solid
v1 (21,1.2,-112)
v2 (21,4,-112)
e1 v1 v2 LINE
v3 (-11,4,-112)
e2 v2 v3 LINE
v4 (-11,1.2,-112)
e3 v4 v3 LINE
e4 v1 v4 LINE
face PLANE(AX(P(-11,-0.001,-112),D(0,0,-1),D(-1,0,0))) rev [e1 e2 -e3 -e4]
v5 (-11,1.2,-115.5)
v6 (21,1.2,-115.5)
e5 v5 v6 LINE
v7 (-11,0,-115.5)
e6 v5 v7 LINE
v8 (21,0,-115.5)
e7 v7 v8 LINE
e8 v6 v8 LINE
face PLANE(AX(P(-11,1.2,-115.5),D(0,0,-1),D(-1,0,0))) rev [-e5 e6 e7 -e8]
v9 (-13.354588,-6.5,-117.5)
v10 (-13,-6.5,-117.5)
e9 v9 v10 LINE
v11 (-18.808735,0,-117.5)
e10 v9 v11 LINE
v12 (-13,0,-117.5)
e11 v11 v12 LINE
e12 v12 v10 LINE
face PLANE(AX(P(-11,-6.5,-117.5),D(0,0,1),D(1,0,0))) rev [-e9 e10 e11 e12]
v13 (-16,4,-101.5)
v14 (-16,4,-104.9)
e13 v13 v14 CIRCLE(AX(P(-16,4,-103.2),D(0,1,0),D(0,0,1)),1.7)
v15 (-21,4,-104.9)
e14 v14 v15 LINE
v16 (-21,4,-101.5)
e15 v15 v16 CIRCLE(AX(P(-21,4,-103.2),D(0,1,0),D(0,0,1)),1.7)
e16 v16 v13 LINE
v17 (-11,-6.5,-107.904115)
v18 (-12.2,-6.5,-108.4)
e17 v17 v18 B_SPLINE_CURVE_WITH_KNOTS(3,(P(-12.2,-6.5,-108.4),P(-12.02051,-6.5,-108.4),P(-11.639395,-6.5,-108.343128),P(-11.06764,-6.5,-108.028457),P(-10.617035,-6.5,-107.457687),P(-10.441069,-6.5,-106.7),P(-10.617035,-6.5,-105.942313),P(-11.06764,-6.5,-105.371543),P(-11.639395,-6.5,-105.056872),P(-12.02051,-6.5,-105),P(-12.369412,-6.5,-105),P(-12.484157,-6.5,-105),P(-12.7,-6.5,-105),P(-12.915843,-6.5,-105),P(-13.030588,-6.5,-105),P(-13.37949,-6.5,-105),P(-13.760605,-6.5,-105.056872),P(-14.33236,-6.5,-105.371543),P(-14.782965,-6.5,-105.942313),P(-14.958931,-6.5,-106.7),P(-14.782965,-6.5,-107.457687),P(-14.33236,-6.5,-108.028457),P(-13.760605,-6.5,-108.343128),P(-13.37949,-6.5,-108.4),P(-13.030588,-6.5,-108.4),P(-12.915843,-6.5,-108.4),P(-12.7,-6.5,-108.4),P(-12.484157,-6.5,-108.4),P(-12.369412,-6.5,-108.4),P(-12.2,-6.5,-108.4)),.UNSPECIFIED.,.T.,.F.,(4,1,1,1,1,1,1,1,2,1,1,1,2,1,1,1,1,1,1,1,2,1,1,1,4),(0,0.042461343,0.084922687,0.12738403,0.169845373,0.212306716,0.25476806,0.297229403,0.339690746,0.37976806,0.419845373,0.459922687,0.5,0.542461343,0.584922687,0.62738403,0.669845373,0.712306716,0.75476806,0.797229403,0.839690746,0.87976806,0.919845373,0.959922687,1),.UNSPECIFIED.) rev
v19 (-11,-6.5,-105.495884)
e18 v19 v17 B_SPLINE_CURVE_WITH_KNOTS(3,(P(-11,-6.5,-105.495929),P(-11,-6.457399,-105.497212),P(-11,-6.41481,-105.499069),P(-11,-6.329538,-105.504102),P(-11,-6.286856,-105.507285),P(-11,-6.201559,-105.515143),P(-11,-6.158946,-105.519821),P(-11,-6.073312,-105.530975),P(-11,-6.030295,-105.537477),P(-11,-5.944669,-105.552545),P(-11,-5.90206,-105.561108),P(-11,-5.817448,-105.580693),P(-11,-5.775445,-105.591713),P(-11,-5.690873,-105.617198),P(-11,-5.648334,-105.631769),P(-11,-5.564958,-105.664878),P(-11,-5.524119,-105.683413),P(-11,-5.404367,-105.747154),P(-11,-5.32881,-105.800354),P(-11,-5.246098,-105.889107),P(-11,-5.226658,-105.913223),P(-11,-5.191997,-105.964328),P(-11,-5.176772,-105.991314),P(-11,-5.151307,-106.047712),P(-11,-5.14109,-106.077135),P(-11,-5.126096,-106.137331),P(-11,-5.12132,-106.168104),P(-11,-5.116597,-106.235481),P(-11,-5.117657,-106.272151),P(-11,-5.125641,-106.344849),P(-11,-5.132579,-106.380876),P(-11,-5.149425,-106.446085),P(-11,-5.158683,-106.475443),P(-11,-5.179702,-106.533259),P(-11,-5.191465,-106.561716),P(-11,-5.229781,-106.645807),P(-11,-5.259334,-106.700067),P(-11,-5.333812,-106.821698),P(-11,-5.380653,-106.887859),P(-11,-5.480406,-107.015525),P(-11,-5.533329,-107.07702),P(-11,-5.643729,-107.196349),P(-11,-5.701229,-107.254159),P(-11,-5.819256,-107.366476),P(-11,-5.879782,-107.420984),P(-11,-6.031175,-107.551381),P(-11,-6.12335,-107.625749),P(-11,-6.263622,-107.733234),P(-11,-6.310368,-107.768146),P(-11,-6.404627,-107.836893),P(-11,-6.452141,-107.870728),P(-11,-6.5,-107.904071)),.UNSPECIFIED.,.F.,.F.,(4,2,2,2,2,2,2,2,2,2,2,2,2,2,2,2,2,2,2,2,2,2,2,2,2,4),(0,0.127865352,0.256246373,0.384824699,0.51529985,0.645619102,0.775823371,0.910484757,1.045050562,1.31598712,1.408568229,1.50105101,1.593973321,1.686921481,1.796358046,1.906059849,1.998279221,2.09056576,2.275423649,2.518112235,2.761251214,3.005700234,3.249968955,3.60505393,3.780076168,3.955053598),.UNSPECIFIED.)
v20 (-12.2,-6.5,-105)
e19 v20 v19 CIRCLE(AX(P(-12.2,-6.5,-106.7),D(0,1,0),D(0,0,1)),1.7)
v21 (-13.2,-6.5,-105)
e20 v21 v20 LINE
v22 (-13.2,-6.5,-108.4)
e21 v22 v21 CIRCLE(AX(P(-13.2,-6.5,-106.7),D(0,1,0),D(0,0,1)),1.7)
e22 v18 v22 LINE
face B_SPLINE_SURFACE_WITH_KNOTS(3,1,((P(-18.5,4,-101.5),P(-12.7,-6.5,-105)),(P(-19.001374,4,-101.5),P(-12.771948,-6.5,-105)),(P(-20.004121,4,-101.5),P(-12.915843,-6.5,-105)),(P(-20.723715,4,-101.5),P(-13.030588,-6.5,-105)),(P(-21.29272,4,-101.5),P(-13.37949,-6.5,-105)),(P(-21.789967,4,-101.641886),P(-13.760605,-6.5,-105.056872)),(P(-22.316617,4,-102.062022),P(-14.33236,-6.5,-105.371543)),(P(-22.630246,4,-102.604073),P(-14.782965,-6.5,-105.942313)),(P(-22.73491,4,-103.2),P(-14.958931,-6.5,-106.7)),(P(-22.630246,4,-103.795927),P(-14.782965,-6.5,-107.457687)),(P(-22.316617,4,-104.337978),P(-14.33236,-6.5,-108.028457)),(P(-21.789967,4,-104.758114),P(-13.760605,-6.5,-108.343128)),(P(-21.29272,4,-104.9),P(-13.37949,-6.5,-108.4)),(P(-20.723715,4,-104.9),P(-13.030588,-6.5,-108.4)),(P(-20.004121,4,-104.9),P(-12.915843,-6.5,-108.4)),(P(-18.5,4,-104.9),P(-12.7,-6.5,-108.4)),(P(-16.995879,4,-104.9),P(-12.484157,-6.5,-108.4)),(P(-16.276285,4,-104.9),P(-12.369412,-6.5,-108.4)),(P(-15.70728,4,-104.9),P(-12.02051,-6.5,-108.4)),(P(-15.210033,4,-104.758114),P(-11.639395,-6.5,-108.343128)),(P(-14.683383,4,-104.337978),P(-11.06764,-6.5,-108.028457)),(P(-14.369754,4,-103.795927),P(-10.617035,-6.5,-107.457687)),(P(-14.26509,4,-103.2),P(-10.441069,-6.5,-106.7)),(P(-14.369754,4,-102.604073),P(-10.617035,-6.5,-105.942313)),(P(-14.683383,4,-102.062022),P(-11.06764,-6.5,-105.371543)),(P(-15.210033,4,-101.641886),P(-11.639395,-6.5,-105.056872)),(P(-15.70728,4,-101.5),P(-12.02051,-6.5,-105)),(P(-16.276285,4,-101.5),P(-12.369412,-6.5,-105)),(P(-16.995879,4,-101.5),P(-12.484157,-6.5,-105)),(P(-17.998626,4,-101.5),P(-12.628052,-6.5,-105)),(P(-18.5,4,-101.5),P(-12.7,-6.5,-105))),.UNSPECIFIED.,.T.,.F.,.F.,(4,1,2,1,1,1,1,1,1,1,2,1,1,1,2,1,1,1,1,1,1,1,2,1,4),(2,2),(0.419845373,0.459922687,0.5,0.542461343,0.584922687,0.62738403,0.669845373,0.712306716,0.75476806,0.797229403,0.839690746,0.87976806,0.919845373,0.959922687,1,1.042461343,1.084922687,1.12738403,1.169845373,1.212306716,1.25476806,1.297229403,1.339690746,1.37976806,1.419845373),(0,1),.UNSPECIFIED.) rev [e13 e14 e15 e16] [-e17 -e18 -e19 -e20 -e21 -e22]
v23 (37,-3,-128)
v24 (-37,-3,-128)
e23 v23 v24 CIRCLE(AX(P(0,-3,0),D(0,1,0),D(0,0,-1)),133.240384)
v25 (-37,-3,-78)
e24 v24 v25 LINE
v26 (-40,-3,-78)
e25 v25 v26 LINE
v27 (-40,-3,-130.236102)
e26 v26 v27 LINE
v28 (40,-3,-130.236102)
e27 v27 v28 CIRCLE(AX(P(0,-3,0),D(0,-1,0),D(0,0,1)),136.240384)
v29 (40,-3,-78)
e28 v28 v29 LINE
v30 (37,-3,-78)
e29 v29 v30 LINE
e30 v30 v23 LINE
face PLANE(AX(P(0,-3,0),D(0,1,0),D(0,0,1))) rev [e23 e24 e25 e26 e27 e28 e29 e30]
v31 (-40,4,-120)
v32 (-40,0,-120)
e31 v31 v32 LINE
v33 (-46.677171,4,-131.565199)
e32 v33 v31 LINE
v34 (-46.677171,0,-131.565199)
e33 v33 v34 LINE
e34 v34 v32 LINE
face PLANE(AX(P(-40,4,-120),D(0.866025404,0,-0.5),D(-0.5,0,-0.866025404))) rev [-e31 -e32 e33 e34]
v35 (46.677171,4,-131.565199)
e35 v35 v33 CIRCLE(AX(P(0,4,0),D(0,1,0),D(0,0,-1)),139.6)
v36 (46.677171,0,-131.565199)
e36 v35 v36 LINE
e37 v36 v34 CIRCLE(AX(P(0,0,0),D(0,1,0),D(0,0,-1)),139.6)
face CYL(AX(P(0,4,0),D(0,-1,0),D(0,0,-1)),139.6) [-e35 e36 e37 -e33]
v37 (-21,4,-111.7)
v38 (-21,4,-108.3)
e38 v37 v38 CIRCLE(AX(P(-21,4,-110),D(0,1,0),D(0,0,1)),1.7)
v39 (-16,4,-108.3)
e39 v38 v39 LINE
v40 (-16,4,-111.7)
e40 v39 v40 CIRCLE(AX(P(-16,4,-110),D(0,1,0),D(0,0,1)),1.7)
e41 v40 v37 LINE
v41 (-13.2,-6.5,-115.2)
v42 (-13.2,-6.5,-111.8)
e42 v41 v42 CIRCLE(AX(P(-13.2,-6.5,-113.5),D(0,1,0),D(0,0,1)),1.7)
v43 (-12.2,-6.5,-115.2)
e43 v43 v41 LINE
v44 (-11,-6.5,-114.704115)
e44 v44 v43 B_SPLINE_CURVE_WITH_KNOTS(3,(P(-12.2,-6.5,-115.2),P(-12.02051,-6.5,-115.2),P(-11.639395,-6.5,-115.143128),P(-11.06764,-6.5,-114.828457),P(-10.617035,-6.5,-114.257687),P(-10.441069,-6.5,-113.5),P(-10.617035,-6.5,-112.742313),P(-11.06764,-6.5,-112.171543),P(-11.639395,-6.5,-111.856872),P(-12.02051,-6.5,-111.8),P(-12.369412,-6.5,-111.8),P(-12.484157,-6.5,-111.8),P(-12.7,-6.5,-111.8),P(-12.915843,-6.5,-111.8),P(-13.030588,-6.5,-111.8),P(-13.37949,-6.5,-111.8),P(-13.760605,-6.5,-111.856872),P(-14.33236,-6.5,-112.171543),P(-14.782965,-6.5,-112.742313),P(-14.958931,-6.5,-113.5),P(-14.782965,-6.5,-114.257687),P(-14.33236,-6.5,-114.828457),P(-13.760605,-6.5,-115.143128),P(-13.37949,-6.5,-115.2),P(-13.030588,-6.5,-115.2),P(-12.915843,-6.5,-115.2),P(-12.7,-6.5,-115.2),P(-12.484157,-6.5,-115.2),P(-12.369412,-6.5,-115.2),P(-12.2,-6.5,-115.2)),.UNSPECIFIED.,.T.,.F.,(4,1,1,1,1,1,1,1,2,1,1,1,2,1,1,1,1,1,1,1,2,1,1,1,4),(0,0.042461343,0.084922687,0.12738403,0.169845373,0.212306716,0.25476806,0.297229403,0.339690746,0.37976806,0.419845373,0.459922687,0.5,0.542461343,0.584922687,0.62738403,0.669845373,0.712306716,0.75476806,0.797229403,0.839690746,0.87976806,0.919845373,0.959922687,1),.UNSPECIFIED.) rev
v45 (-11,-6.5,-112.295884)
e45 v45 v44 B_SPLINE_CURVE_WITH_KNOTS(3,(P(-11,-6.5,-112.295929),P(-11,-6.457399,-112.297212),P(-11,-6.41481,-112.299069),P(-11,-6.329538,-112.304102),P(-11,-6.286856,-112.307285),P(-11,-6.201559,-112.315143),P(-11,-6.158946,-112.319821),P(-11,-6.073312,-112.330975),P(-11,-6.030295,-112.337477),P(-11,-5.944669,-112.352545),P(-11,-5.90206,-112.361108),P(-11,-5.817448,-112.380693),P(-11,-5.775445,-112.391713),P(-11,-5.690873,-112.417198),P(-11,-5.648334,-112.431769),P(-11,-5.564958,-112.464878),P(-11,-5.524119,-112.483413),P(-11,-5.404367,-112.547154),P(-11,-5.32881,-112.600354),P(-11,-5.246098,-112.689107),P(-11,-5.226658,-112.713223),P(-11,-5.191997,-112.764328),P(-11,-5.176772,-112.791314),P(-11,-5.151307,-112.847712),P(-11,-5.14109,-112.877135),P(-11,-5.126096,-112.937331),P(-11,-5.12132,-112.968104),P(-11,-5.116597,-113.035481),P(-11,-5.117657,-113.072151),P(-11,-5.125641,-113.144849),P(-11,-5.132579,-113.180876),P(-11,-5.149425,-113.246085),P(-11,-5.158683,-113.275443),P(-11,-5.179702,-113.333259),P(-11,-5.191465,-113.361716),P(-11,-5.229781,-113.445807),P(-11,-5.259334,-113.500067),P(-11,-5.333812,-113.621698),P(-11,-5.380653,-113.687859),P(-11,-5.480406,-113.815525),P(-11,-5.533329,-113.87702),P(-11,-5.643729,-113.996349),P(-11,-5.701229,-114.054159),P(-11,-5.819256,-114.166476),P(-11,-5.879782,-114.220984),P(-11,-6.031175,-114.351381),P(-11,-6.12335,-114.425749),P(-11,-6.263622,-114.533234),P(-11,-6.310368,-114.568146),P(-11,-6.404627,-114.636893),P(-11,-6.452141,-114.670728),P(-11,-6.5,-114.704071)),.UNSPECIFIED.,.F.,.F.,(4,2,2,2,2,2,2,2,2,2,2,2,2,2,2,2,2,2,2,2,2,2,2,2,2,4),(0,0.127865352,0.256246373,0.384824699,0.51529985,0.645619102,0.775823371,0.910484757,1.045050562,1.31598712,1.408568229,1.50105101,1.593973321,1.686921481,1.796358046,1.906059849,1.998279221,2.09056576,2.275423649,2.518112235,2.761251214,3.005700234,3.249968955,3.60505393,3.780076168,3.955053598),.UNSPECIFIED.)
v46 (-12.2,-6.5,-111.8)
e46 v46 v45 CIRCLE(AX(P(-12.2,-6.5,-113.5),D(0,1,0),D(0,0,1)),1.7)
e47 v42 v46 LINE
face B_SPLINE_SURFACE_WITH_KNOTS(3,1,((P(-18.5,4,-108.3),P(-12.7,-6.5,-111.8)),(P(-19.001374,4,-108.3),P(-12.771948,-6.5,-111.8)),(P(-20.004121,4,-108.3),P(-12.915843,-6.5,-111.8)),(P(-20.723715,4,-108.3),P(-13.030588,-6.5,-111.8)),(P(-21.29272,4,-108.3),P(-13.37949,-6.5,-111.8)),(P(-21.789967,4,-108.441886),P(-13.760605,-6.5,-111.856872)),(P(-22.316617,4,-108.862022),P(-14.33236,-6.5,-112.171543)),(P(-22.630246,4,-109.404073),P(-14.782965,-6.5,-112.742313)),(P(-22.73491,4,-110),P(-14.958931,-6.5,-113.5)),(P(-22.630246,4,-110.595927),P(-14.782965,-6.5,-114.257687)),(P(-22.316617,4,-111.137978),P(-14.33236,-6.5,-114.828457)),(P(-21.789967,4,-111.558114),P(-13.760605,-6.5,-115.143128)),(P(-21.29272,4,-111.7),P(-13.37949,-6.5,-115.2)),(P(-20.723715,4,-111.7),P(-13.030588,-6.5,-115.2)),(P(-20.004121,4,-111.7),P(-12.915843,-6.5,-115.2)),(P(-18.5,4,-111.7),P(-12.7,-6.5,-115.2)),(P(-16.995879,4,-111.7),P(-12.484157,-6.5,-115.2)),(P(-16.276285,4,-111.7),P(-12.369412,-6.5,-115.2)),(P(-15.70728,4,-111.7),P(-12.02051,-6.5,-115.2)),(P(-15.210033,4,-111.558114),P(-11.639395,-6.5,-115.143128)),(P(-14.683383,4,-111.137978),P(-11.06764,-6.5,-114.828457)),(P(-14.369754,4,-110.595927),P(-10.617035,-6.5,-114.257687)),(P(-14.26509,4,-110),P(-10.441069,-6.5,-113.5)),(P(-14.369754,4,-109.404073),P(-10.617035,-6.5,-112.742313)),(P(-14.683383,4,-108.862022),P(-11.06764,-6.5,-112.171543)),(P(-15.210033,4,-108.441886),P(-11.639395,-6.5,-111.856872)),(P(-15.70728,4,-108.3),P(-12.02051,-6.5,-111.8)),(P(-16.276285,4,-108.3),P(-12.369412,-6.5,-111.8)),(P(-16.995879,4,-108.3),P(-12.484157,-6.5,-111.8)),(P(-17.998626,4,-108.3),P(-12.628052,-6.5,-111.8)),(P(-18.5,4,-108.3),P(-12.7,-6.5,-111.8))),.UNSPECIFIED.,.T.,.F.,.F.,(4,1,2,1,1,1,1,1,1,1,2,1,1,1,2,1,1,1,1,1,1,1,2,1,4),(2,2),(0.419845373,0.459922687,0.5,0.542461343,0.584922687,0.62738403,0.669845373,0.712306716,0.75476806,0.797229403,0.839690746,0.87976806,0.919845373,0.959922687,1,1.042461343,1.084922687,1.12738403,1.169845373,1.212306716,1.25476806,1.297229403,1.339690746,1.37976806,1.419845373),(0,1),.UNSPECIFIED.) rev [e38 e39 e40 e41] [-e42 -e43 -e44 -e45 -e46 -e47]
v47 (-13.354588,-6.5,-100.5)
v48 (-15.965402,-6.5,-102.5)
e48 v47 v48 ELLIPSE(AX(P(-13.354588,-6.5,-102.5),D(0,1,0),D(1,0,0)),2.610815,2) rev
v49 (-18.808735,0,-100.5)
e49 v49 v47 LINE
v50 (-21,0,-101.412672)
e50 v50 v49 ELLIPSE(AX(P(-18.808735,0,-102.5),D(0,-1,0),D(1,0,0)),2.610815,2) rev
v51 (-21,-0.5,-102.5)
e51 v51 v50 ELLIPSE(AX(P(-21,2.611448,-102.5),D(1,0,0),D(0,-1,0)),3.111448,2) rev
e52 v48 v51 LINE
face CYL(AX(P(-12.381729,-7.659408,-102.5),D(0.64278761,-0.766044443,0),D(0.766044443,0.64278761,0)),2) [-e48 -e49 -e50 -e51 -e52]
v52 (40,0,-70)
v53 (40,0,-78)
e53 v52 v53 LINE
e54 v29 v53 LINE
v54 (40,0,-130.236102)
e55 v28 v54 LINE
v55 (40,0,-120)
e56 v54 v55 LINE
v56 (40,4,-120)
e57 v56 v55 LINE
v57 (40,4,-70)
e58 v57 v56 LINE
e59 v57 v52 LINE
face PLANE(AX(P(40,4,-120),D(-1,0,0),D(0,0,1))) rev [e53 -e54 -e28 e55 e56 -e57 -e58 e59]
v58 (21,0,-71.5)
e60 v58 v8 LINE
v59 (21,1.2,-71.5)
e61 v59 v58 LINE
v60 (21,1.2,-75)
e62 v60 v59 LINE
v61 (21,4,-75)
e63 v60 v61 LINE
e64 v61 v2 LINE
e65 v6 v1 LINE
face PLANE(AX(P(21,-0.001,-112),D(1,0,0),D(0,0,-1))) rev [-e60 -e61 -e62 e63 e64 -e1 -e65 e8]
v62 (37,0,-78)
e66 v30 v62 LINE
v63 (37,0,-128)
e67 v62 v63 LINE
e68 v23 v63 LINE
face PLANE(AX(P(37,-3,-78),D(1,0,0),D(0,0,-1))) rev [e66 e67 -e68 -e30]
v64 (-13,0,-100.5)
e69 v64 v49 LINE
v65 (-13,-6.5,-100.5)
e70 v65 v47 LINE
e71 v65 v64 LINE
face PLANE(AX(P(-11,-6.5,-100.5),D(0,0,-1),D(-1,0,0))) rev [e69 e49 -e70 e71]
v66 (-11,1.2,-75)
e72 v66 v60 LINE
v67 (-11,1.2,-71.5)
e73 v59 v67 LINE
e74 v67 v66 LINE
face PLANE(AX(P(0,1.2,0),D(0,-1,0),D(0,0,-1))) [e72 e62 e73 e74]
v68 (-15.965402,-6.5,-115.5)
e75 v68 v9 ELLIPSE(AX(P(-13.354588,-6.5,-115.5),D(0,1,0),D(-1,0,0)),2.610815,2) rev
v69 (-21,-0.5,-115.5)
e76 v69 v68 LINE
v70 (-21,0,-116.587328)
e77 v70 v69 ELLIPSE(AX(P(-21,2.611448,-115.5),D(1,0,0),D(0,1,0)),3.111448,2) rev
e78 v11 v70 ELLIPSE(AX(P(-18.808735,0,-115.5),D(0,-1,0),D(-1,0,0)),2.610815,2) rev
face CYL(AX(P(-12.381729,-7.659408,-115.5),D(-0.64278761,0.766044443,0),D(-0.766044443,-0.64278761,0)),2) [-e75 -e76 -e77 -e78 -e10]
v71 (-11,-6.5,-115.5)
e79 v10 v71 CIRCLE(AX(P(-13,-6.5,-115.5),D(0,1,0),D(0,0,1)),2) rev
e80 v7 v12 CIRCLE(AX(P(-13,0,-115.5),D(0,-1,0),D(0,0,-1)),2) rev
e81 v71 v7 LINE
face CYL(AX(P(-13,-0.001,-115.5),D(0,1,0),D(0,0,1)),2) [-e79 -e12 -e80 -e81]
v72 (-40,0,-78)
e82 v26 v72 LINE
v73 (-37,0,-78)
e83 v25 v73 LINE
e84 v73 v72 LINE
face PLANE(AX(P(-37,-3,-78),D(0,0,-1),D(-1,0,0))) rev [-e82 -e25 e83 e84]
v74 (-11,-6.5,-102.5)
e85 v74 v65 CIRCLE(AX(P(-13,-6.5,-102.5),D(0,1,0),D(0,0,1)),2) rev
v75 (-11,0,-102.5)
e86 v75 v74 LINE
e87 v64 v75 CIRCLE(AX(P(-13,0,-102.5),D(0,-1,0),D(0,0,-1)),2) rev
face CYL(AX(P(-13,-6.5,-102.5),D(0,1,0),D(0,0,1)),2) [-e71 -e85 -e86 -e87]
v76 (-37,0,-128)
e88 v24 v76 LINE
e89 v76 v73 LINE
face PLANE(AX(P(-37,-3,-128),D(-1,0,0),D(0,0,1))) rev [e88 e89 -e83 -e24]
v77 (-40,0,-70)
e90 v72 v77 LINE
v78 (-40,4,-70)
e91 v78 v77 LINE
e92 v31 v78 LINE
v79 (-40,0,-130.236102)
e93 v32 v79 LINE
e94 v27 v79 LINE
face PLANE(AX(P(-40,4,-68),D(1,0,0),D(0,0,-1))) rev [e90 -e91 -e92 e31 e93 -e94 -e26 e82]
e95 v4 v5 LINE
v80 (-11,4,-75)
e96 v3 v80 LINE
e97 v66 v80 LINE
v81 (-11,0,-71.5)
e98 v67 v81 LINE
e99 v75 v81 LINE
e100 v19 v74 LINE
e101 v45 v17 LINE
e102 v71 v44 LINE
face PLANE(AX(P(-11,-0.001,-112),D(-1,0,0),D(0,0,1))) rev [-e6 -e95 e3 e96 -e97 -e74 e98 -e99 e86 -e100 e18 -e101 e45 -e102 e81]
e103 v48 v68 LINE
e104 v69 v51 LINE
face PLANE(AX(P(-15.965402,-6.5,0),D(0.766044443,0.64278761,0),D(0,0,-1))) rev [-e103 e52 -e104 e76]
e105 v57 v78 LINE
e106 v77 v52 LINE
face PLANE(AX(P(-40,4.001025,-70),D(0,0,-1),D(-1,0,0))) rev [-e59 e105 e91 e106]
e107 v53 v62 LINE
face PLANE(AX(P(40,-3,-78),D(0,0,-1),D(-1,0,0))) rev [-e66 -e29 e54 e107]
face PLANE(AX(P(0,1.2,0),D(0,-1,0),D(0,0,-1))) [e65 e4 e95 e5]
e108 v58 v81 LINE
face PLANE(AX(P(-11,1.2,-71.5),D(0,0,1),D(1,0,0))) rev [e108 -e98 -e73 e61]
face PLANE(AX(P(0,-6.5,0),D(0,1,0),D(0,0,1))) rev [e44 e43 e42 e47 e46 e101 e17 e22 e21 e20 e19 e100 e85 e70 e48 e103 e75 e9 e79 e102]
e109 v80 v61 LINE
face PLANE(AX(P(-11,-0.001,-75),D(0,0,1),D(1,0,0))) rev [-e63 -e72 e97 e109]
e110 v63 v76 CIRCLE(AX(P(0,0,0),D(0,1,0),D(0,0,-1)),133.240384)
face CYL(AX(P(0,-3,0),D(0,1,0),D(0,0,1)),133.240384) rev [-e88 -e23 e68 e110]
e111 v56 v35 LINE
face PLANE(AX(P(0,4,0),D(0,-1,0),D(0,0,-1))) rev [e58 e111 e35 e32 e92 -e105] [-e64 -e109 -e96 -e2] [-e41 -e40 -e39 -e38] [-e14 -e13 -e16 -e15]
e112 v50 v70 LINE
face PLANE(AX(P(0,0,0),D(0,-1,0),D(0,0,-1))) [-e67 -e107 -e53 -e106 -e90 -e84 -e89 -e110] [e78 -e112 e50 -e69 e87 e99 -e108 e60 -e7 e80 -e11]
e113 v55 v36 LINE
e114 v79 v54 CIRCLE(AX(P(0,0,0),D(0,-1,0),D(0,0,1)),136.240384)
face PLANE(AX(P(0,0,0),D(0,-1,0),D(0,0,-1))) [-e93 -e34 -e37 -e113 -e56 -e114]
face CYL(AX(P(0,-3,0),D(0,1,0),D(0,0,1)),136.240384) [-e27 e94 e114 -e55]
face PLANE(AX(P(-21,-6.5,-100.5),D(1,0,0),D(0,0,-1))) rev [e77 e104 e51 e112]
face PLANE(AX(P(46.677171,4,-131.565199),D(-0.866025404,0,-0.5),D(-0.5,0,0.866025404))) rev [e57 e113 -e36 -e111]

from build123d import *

# Parameters (mm, degrees)
BOSS_EXTRUDE1_DEPTH = 4
CUT_EXTRUDE1_REACH  = 149.251
SKETCH2_W           = 32
SKETCH2_H           = 37
SKETCH3_W           = 32
SKETCH3_H           = 44
CUT_EXTRUDE2_DEPTH  = 1.2
BOSS_EXTRUDE2_DEPTH = 3
CUT_EXTRUDE3_REACH  = 149.251
SKETCH5_W           = 80
SKETCH5_H           = 2
SKETCH13_W          = 10
SKETCH13_H          = 17
BOSS_EXTRUDE3_DEPTH = 6.5
LPATTERN1_COUNT     = 2
LPATTERN1_PITCH     = 6.8
CHAMFER1_SIZE       = 6
CHAMFER1_SIZE2      = 5.034597787
FILLET1_R           = 2


with BuildPart() as part:
    # Sketch1 → Boss-Extrude1 (new body)
    with BuildSketch(Plane(origin=(0, 0, 0), x_dir=(1, 0, 0), z_dir=(0, 1, 0))):
        with BuildLine():
            Line((-40, 68), (-40, 120))
            Line((-40, 120), (-46.677171015, 131.565199449))
            ThreePointArc((-46.677171015, 131.565199449), (0, 139.6), (46.677171015, 131.565199449))
            Line((46.677171015, 131.565199449), (40, 120))
            Line((40, 120), (40, 68))
            Line((40, 68), (-40, 68))
        make_face()
    extrude(amount=BOSS_EXTRUDE1_DEPTH)

    # Sketch2 → Cut-Extrude1 (cut, up to next)
    with BuildSketch(Plane(origin=(0, 4, 0), x_dir=(1, 0, 0), z_dir=(0, 1, 0)), mode=Mode.PRIVATE) as cut_extrude1_sk1:
        with Locations((5, 93.5)):
            Rectangle(SKETCH2_W, SKETCH2_H)
    cut_extrude1_tool1 = extrude(cut_extrude1_sk1.sketch, amount=-CUT_EXTRUDE1_REACH, mode=Mode.PRIVATE) & part.part
    add(cut_extrude1_tool1.solids().sort_by_distance((5, 4, -93.5))[0], mode=Mode.SUBTRACT)

    # Sketch3 → Cut-Extrude2 (cut)
    with BuildSketch(Plane.XZ):
        with Locations((5, -93.5)):
            Rectangle(SKETCH3_W, SKETCH3_H)
    extrude(amount=-CUT_EXTRUDE2_DEPTH, mode=Mode.SUBTRACT)

    # Sketch4 → Boss-Extrude2 (add)
    with BuildSketch(Plane.XZ):
        with BuildLine():
            Line((-40, -78), (-40, -130.236102159))
            ThreePointArc((-40, -130.236102159), (0, -136.240384268), (40, -130.236102159))
            Line((40, -130.236102159), (40, -78))
            Line((40, -78), (37, -78))
            Line((37, -78), (37, -128))
            ThreePointArc((37, -128), (0, -133.240384268), (-37, -128))
            Line((-37, -128), (-37, -78))
            Line((-37, -78), (-40, -78))
        make_face()
    extrude(amount=BOSS_EXTRUDE2_DEPTH)

    # Sketch5 → Cut-Extrude3 (cut, up to next)
    with BuildSketch(Plane.XZ, mode=Mode.PRIVATE) as cut_extrude3_sk1:
        with Locations((0, -69)):
            Rectangle(SKETCH5_W, SKETCH5_H)
    cut_extrude3_tool1 = extrude(cut_extrude3_sk1.sketch, amount=-CUT_EXTRUDE3_REACH, mode=Mode.PRIVATE) & part.part
    add(cut_extrude3_tool1.solids().sort_by_distance((0, 0, -69))[0], mode=Mode.SUBTRACT)

    # Sketch13 → Boss-Extrude3 (add)
    with BuildSketch(Plane.XZ):
        with Locations((-16, -109)):
            Rectangle(SKETCH13_W, SKETCH13_H)
    extrude(amount=BOSS_EXTRUDE3_DEPTH)

    # Cut-Loft1: read off the stored shape, not the designer's step
    # Cut-Loft1: loft between two sections, ruled curve by curve
    cut_loft1_from = [
        Edge.make_bspline([(-18.5, 4, -108.3), (-19.001373519, 4, -108.3), (-20.004120556, 4, -108.3), (-20.723714816, 4, -108.3), (-21.292720218, 4, -108.3), (-21.789967148, 4, -108.441885809), (-22.316617117, 4, -108.86202161), (-22.630245954, 4, -109.404072839), (-22.73490999, 4, -110), (-22.630245954, 4, -110.595927161), (-22.316617117, 4, -111.13797839), (-21.789967148, 4, -111.558114191), (-21.292720218, 4, -111.7), (-20.723714816, 4, -111.7), (-20.004120556, 4, -111.7), (-18.5, 4, -111.7), (-16.995879444, 4, -111.7), (-16.276285184, 4, -111.7), (-15.707279782, 4, -111.7), (-15.210032852, 4, -111.558114191), (-14.683382883, 4, -111.13797839), (-14.369754046, 4, -110.595927161), (-14.26509001, 4, -110), (-14.369754046, 4, -109.404072839), (-14.683382883, 4, -108.86202161), (-15.210032852, 4, -108.441885809), (-15.707279782, 4, -108.3), (-16.276285184, 4, -108.3), (-16.995879444, 4, -108.3), (-17.998626481, 4, -108.3), (-18.5, 4, -108.3)], [0.419845373, 0.419845373, 0.419845373, 0.419845373, 0.459922687, 0.5, 0.5, 0.542461343, 0.584922687, 0.62738403, 0.669845373, 0.712306716, 0.75476806, 0.797229403, 0.839690746, 0.839690746, 0.87976806, 0.919845373, 0.959922687, 1, 1, 1.042461343, 1.084922687, 1.12738403, 1.169845373, 1.212306716, 1.25476806, 1.297229403, 1.339690746, 1.339690746, 1.37976806, 1.419845373, 1.419845373, 1.419845373, 1.419845373], 3),
    ]
    cut_loft1_to = [
        Edge.make_bspline([(-12.7, -6.5, -111.8), (-12.771947826, -6.5, -111.8), (-12.915843478, -6.5, -111.8), (-13.030587652, -6.5, -111.8), (-13.379489971, -6.5, -111.8), (-13.760605324, -6.5, -111.856871893), (-14.332360426, -6.5, -112.171543481), (-14.782964502, -6.5, -112.74231317), (-14.958930975, -6.5, -113.5), (-14.782964502, -6.5, -114.25768683), (-14.332360426, -6.5, -114.828456519), (-13.760605324, -6.5, -115.143128107), (-13.379489971, -6.5, -115.2), (-13.030587652, -6.5, -115.2), (-12.915843478, -6.5, -115.2), (-12.7, -6.5, -115.2), (-12.484156522, -6.5, -115.2), (-12.369412348, -6.5, -115.2), (-12.020510029, -6.5, -115.2), (-11.639394676, -6.5, -115.143128107), (-11.067639574, -6.5, -114.828456519), (-10.617035498, -6.5, -114.25768683), (-10.441069025, -6.5, -113.5), (-10.617035498, -6.5, -112.74231317), (-11.067639574, -6.5, -112.171543481), (-11.639394676, -6.5, -111.856871893), (-12.020510029, -6.5, -111.8), (-12.369412348, -6.5, -111.8), (-12.484156522, -6.5, -111.8), (-12.628052174, -6.5, -111.8), (-12.7, -6.5, -111.8)], [0.419845373, 0.419845373, 0.419845373, 0.419845373, 0.459922687, 0.5, 0.5, 0.542461343, 0.584922687, 0.62738403, 0.669845373, 0.712306716, 0.75476806, 0.797229403, 0.839690746, 0.839690746, 0.87976806, 0.919845373, 0.959922687, 1, 1, 1.042461343, 1.084922687, 1.12738403, 1.169845373, 1.212306716, 1.25476806, 1.297229403, 1.339690746, 1.339690746, 1.37976806, 1.419845373, 1.419845373, 1.419845373, 1.419845373], 3),
    ]
    cut_loft1 = Solid(Shell([*[Face.make_surface_from_curves(cut_loft1_from[k], cut_loft1_to[k]) for k in range(1)], Face(Wire(cut_loft1_from)), Face(Wire(cut_loft1_to))]))
    add(cut_loft1, mode=Mode.SUBTRACT)

    # LPattern1: Cut-Loft1 ×2
    with Locations(*[(0, 0, i * LPATTERN1_PITCH) for i in range(1, LPATTERN1_COUNT)]):
        add(cut_loft1, mode=Mode.SUBTRACT)

    # Chamfer1
    chamfer1_edges = [part.edges().sort_by_distance(p)[0] for p in [
        (-21, -6.5, -109),
    ]]
    chamfer1_side = [part.faces().sort_by_distance(p)[0] for p in [
        (-21, -3.25, -109),
    ]]
    chamfer(chamfer1_edges, length=CHAMFER1_SIZE, length2=CHAMFER1_SIZE2, reference=chamfer1_side[0])

    # Fillet1
    fillet1_edges = [part.edges().sort_by_distance(p)[0] for p in [
        (-18.482701106, -3.5, -100.5),
        (-18.482701106, -3.5, -117.5),
        (-11, -3.25, -117.5),
        (-11, -3.25, -100.5),
    ]]
    fillet(fillet1_edges, radius=FILLET1_R)


solid = part.part
